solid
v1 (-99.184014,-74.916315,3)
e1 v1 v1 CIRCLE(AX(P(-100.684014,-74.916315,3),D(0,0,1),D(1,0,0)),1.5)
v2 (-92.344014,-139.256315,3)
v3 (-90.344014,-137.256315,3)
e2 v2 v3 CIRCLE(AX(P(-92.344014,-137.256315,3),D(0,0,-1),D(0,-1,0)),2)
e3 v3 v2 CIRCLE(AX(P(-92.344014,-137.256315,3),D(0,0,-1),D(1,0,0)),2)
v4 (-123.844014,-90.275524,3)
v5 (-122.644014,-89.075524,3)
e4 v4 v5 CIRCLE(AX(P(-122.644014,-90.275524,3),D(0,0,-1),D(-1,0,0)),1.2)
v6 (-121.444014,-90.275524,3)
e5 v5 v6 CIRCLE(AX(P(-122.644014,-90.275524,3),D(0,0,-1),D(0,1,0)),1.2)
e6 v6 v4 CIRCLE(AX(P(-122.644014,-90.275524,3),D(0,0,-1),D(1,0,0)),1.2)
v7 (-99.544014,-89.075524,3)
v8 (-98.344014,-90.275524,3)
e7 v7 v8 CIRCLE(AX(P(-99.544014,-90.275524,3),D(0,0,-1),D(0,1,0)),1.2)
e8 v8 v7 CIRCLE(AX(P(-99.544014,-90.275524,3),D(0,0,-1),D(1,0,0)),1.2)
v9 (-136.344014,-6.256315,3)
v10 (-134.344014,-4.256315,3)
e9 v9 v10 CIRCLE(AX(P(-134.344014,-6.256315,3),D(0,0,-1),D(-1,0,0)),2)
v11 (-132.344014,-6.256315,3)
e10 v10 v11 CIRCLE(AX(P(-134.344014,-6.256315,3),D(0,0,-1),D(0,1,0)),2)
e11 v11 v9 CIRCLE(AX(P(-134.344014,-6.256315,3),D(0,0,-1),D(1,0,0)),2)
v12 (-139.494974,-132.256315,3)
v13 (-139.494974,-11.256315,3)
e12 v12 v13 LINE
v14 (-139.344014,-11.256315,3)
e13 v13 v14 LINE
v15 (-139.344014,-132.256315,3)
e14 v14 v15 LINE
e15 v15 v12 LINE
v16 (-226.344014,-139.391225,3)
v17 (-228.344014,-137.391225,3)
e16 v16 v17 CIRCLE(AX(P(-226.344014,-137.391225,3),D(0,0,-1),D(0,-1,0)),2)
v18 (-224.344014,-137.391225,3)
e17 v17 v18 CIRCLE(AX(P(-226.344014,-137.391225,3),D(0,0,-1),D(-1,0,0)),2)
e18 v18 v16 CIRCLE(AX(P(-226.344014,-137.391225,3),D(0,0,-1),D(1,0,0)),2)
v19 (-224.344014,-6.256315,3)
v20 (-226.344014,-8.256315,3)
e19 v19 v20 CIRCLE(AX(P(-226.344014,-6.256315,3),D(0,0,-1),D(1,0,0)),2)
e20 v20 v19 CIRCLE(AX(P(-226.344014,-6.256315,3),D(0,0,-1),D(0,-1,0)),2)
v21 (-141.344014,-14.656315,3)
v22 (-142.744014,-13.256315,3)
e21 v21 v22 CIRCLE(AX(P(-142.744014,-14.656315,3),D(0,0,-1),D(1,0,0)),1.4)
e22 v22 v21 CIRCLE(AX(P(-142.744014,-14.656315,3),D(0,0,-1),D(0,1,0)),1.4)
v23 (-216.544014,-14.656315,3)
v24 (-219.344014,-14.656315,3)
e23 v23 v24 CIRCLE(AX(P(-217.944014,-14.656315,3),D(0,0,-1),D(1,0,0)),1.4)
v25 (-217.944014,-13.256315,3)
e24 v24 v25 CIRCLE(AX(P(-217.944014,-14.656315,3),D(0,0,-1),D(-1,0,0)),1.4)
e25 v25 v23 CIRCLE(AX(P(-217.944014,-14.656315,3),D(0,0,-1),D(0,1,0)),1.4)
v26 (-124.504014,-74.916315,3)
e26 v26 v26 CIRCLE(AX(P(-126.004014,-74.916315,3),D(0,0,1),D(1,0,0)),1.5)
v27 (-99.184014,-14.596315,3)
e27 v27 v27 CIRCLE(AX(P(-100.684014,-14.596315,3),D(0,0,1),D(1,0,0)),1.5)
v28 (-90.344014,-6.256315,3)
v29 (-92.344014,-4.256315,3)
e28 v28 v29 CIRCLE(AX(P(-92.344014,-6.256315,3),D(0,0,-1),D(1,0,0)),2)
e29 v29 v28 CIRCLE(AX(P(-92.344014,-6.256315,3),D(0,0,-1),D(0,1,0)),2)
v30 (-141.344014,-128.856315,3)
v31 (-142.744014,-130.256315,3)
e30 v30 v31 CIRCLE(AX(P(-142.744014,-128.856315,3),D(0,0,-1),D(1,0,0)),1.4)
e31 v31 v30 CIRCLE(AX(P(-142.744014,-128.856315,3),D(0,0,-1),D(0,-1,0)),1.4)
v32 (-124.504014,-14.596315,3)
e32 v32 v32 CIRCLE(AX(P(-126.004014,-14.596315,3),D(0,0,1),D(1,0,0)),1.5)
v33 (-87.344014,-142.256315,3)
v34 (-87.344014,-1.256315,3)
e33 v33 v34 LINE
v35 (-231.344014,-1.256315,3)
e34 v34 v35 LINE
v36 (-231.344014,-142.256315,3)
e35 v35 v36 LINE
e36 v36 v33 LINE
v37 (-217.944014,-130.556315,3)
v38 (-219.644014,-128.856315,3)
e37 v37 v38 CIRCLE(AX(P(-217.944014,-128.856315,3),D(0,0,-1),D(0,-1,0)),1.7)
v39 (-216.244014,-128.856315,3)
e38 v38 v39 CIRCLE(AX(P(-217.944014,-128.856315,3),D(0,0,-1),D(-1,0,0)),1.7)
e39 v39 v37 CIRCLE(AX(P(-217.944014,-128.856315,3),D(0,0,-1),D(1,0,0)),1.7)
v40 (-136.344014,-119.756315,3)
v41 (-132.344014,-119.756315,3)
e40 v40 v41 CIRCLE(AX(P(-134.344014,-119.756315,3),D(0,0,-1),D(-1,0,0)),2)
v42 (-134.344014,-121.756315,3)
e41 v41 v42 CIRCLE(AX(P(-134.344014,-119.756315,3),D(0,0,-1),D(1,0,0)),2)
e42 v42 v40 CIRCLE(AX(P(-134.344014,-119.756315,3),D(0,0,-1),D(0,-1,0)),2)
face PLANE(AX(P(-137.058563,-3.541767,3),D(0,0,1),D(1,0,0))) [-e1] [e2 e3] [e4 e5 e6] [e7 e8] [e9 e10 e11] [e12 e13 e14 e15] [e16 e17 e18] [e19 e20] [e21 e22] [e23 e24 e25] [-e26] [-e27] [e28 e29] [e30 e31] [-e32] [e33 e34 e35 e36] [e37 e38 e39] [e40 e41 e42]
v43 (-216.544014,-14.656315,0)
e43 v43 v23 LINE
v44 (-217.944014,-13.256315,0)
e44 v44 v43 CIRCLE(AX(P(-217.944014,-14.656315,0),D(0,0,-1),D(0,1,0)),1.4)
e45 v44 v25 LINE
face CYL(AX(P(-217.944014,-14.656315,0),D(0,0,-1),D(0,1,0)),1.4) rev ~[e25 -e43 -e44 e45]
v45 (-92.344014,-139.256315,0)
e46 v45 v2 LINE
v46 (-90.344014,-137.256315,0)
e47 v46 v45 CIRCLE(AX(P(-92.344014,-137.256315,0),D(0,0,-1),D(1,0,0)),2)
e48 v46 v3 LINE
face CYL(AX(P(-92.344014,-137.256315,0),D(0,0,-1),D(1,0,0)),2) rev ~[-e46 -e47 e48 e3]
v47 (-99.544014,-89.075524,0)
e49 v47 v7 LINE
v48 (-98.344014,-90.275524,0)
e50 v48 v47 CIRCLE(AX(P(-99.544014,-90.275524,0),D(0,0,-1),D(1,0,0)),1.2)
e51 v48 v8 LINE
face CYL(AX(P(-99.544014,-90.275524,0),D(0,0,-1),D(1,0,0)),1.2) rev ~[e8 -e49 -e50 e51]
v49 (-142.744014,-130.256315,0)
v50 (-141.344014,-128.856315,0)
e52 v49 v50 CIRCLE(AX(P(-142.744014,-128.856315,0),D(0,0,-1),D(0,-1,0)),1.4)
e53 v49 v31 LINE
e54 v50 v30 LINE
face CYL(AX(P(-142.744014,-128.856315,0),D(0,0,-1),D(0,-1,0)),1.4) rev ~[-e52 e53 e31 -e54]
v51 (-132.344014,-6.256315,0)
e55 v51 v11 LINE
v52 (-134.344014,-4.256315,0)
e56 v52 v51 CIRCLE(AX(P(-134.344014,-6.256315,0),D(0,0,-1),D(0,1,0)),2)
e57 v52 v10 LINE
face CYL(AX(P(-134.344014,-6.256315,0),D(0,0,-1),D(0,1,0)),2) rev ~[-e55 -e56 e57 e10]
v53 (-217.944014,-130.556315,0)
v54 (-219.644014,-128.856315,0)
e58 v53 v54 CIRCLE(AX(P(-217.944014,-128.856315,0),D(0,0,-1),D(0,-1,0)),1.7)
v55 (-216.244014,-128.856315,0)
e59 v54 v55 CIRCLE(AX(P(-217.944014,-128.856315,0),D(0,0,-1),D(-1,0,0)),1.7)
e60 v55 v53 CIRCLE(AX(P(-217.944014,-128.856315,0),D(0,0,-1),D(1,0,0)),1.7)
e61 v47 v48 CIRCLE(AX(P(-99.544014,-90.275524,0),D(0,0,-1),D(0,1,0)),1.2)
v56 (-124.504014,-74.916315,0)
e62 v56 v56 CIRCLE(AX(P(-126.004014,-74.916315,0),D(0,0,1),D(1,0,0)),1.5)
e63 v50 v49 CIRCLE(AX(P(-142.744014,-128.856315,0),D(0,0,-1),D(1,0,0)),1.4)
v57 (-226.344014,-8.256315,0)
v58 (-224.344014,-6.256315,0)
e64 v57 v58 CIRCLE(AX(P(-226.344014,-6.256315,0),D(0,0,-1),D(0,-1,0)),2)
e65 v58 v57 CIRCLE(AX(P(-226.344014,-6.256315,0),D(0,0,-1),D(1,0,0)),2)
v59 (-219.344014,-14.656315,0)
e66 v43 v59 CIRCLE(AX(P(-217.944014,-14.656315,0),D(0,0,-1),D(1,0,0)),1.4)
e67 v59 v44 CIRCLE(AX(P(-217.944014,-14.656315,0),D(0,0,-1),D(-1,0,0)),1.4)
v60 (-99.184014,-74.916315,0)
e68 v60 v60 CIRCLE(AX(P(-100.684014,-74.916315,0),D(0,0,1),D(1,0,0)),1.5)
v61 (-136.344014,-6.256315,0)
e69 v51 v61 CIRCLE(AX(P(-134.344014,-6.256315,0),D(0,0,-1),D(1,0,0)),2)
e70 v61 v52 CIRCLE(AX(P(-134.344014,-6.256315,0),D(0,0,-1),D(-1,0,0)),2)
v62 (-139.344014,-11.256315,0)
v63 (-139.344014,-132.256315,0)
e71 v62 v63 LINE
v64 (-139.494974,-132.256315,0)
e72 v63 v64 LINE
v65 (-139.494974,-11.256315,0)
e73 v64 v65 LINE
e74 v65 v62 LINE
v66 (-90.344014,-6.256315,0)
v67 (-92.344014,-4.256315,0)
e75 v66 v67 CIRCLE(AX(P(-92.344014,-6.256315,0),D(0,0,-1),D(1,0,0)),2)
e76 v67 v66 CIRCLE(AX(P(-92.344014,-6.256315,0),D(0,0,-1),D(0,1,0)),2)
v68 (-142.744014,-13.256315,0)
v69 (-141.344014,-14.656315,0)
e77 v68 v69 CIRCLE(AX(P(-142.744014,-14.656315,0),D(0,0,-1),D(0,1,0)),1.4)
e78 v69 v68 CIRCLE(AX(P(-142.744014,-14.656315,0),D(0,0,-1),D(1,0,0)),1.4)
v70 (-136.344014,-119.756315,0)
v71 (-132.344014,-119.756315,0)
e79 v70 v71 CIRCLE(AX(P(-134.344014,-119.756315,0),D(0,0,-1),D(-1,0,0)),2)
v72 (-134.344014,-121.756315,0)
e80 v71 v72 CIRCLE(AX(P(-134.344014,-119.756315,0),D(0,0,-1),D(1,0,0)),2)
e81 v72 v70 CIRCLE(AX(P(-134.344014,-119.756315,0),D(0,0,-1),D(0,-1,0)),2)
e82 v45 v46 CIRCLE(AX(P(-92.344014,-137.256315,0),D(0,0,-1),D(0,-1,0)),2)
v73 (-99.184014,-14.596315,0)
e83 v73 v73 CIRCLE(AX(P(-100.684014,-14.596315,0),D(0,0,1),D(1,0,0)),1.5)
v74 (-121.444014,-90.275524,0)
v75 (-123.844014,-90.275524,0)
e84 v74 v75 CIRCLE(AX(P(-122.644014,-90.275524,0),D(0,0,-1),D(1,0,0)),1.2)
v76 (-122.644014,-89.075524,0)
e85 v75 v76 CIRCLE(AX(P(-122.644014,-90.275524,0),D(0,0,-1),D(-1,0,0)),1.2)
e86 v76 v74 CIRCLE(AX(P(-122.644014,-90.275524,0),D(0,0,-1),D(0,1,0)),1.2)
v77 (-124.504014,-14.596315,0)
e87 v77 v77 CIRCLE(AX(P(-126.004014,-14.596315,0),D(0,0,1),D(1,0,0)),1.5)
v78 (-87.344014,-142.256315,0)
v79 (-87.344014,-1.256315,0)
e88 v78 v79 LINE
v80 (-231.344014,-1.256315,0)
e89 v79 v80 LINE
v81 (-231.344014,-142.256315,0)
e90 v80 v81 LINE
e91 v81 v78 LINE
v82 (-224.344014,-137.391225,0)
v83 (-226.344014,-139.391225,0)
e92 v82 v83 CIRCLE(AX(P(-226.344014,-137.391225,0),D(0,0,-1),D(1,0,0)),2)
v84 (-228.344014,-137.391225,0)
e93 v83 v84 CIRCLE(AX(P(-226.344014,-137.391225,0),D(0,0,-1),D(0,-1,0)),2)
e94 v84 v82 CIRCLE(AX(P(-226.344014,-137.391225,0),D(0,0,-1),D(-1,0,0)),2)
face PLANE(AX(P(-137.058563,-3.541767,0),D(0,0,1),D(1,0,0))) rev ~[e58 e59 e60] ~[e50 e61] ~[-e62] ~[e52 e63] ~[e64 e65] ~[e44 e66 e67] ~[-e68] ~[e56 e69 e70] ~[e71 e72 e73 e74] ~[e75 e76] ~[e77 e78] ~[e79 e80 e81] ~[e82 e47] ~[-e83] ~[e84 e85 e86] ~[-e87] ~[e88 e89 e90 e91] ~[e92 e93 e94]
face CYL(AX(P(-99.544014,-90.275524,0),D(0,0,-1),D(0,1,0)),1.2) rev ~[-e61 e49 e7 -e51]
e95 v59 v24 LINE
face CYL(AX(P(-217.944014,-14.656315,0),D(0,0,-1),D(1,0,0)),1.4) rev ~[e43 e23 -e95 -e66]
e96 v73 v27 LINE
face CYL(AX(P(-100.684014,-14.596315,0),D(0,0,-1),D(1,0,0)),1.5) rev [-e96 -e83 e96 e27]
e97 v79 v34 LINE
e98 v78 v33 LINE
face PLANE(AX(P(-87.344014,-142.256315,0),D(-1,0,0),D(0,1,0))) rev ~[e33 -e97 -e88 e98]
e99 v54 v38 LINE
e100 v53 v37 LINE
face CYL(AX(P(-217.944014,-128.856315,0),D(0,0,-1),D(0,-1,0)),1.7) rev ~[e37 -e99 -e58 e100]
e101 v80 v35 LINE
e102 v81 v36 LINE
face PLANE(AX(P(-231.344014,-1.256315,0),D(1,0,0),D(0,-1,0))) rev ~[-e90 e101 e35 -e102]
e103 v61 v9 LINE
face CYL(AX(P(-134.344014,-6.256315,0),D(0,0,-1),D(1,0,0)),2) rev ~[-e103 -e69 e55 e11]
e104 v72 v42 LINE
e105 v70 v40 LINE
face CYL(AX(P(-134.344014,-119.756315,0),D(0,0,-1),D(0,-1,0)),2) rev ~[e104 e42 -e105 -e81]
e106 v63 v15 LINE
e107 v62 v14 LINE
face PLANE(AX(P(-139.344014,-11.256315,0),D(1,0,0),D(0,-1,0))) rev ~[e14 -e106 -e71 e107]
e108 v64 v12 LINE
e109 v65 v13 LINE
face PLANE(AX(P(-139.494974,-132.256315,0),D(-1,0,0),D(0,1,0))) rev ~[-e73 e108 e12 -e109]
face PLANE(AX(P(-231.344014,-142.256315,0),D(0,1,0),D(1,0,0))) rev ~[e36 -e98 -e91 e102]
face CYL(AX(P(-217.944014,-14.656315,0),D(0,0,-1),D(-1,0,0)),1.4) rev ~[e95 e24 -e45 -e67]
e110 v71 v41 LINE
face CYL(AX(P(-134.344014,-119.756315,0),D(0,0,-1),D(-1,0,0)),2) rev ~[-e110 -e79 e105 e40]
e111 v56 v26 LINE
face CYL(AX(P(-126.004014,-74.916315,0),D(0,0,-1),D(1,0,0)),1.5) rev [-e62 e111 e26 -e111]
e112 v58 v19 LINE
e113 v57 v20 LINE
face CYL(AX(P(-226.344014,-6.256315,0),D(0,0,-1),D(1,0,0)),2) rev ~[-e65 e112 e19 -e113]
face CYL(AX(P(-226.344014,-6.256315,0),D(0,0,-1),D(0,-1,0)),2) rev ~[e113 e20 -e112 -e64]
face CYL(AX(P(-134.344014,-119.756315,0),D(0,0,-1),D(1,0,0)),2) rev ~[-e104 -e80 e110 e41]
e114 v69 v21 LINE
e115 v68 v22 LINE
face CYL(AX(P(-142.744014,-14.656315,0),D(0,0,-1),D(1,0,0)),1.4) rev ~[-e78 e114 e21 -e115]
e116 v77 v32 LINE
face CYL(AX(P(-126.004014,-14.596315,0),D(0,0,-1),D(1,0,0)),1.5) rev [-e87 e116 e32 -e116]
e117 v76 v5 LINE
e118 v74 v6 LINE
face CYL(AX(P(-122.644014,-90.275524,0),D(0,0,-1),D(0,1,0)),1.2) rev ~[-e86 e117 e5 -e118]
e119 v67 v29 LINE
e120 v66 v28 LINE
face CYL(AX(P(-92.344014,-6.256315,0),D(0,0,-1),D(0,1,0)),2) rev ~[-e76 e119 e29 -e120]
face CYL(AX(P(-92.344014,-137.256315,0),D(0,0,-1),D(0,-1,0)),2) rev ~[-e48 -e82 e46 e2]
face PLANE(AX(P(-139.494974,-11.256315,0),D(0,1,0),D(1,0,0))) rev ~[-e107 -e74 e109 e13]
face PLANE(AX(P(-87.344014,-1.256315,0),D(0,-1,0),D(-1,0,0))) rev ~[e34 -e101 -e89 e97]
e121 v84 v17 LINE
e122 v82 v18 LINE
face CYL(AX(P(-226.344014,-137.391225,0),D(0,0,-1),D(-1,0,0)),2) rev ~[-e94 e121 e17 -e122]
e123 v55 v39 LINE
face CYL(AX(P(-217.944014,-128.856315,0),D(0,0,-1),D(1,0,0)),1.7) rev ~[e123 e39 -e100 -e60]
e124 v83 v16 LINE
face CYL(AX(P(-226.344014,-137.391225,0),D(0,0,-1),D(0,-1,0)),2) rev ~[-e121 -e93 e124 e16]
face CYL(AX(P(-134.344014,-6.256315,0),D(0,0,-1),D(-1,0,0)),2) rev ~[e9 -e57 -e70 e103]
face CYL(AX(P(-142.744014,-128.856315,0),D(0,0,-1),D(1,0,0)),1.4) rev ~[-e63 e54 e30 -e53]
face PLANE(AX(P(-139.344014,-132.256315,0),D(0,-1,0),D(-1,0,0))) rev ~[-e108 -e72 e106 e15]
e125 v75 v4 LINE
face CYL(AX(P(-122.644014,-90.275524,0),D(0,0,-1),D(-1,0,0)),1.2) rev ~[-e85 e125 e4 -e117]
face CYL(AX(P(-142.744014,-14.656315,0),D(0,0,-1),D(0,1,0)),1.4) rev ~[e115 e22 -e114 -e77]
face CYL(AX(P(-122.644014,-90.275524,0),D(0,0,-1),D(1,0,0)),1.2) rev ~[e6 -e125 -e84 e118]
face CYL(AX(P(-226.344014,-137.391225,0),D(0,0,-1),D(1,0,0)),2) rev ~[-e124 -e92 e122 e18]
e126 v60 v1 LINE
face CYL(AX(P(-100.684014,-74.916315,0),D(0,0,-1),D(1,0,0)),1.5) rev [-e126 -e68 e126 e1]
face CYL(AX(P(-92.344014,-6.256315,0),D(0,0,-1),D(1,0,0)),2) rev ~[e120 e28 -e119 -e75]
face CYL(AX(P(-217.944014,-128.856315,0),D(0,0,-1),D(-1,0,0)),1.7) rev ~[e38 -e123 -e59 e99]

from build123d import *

# Parameters (mm, degrees)
F0_R     = 1.5
F0_W     = 3
F0_H     = 5
F0_W_2   = 4
F0_H_2   = 75.28
F0_H_3   = 40.64
F0_H_4   = 5.08
F1_DEPTH = 3


# Not quite as in the source:
# - a feature names something its author has since deleted; it is built from what else it names


with BuildPart() as f1:
    # F0 (on Top) → F1 (new body)
    with BuildSketch(Plane.XY):
        with BuildLine():
            Line((-134.3440142274, -1.256315279), (-139.3440142274, -1.256315279))
            Line((-139.3440142274, -1.256315279), (-139.3440142274, -6.256315279))
            Line((-139.3440142274, -6.256315279), (-136.3440142274, -6.256315279))
            ThreePointArc((-136.3440142274, -6.256315279), (-135.7582277898, -4.8421017166), (-134.3440142274, -4.256315279))
            Line((-134.3440142274, -4.256315279), (-134.3440142274, -1.256315279))
        make_face()
        Polygon((-139.3440142274, -6.256315279), (-139.3440142274, -1.256315279), (-221.3440142274, -1.256315279), (-221.3440142274, -6.256315279), (-221.3440142274, -11.256315279), (-217.9440142274, -11.256315279), (-151.4240142274, -11.256315279), (-147.4240142274, -11.256315279), (-142.7440142274, -11.256315279), (-139.4949736476, -11.256315279), (-139.3440142274, -11.256315279), align=None)
        with BuildLine():
            Line((-129.3440142274, -1.256315279), (-134.3440142274, -1.256315279))
            Line((-134.3440142274, -1.256315279), (-134.3440142274, -4.256315279))
            ThreePointArc((-134.3440142274, -4.256315279), (-132.929800665, -4.8421017166), (-132.3440142274, -6.256315279))
            ThreePointArc((-132.3440142274, -6.256315279), (-134.3440142274, -8.256315279), (-136.3440142274, -6.256315279))
            Line((-136.3440142274, -6.256315279), (-139.3440142274, -6.256315279))
            Line((-139.3440142274, -6.256315279), (-139.3440142274, -11.256315279))
            Line((-139.3440142274, -11.256315279), (-129.3440142274, -11.256315279))
            Line((-129.3440142274, -11.256315279), (-129.3440142274, -6.256315279))
            Line((-129.3440142274, -6.256315279), (-129.3440142274, -1.256315279))
        make_face()
        with BuildLine():
            Line((-221.3440142274, -6.256315279), (-221.3440142274, -1.256315279))
            Line((-221.3440142274, -1.256315279), (-231.3440142274, -1.256315279))
            Line((-231.3440142274, -1.256315279), (-231.3440142274, -132.256315279))
            Line((-231.3440142274, -132.256315279), (-221.3440142274, -132.256315279))
            Line((-221.3440142274, -132.256315279), (-221.3440142274, -128.856315279))
            Line((-221.3440142274, -128.856315279), (-221.3440142274, -14.656315279))
            Line((-221.3440142274, -14.656315279), (-221.3440142274, -11.256315279))
            Line((-221.3440142274, -11.256315279), (-226.3440142274, -11.256315279))
            Line((-226.3440142274, -11.256315279), (-226.3440142274, -8.256315279))
            ThreePointArc((-226.3440142274, -8.256315279), (-227.7582277898, -4.8421017166), (-224.3440142274, -6.256315279))
            Line((-224.3440142274, -6.256315279), (-221.3440142274, -6.256315279))
        make_face()
        with BuildLine():
            Line((-92.3440142274, -1.256315279), (-129.3440142274, -1.256315279))
            Line((-129.3440142274, -1.256315279), (-129.3440142274, -6.256315279))
            Line((-129.3440142274, -6.256315279), (-126.3440142274, -6.256315279))
            Line((-126.3440142274, -6.256315279), (-100.3440142274, -6.256315279))
            Line((-100.3440142274, -6.256315279), (-97.3440142274, -6.256315279))
            Line((-97.3440142274, -6.256315279), (-97.3440142274, -11.256315279))
            Line((-97.3440142274, -11.256315279), (-97.3440142274, -14.596315279))
            Line((-97.3440142274, -14.596315279), (-97.3440142274, -74.916315279))
            Line((-97.3440142274, -74.916315279), (-97.3440142274, -78.256315279))
            Line((-97.3440142274, -78.256315279), (-100.6840142274, -78.256315279))
            Line((-100.6840142274, -78.256315279), (-126.0040142274, -78.256315279))
            Line((-126.0040142274, -78.256315279), (-129.3440142274, -78.256315279))
            Line((-129.3440142274, -78.256315279), (-129.3440142274, -108.756315279))
            Line((-129.3440142274, -108.756315279), (-129.3440142274, -111.756315279))
            Line((-129.3440142274, -111.756315279), (-129.3440142274, -114.756315279))
            Line((-129.3440142274, -114.756315279), (-129.3440142274, -124.756315279))
            Line((-129.3440142274, -124.756315279), (-129.3440142274, -142.256315279))
            Line((-129.3440142274, -142.256315279), (-92.3440142274, -142.256315279))
            Line((-92.3440142274, -142.256315279), (-92.3440142274, -139.256315279))
            ThreePointArc((-92.3440142274, -139.256315279), (-93.7582277898, -135.8421017166), (-90.3440142274, -137.256315279))
            Line((-90.3440142274, -137.256315279), (-87.3440142274, -137.256315279))
            Line((-87.3440142274, -137.256315279), (-87.3440142274, -6.256315279))
            Line((-87.3440142274, -6.256315279), (-90.3440142274, -6.256315279))
            ThreePointArc((-90.3440142274, -6.256315279), (-93.7582277898, -7.6705288414), (-92.3440142274, -4.256315279))
            Line((-92.3440142274, -4.256315279), (-92.3440142274, -1.256315279))
        make_face()
        Polygon((-97.8440142274, -124.5755243927), (-124.3440142274, -124.5755243927), (-124.3440142274, -90.2755243927), (-124.3440142274, -88.5755243927), (-122.6440142274, -88.5755243927), (-99.5440142274, -88.5755243927), (-97.8440142274, -88.5755243927), (-97.8440142274, -90.2755243927), align=None, mode=Mode.SUBTRACT)
        Polygon((-129.3440142274, -11.256315279), (-139.3440142274, -11.256315279), (-139.3440142274, -14.656315279), (-139.3440142274, -114.756315279), (-129.3440142274, -114.756315279), (-129.3440142274, -111.756315279), (-129.3440142274, -108.756315279), (-129.3440142274, -78.256315279), (-129.3440142274, -74.916315279), (-129.3440142274, -27.956315279), (-129.3440142274, -27.456315279), (-129.3440142274, -14.596315279), (-129.3440142274, -14.056315279), align=None)
        with BuildLine():
            Line((-221.3440142274, -11.256315279), (-221.3440142274, -6.256315279))
            Line((-221.3440142274, -6.256315279), (-224.3440142274, -6.256315279))
            ThreePointArc((-224.3440142274, -6.256315279), (-224.929800665, -7.6705288414), (-226.3440142274, -8.256315279))
            Line((-226.3440142274, -8.256315279), (-226.3440142274, -11.256315279))
            Line((-226.3440142274, -11.256315279), (-221.3440142274, -11.256315279))
        make_face()
        Polygon((-126.3440142274, -6.256315279), (-129.3440142274, -6.256315279), (-129.3440142274, -11.256315279), (-126.5440142274, -11.256315279), (-126.3440142274, -11.256315279), align=None)
        with BuildLine():
            Line((-87.3440142274, -1.256315279), (-92.3440142274, -1.256315279))
            Line((-92.3440142274, -1.256315279), (-92.3440142274, -4.256315279))
            ThreePointArc((-92.3440142274, -4.256315279), (-90.929800665, -4.8421017166), (-90.3440142274, -6.256315279))
            Line((-90.3440142274, -6.256315279), (-87.3440142274, -6.256315279))
            Line((-87.3440142274, -6.256315279), (-87.3440142274, -1.256315279))
        make_face()
        Polygon((-126.5440142274, -11.256315279), (-129.3440142274, -11.256315279), (-129.3440142274, -14.056315279), (-129.3440142274, -14.596315279), (-129.3440142274, -27.456315279), (-129.3440142274, -27.956315279), (-129.3440142274, -74.916315279), (-129.3440142274, -78.256315279), (-126.0040142274, -78.256315279), (-100.6840142274, -78.256315279), (-97.3440142274, -78.256315279), (-97.3440142274, -74.916315279), (-97.3440142274, -14.596315279), (-97.3440142274, -11.256315279), (-100.3440142274, -11.256315279), (-100.6840142274, -11.256315279), (-126.0040142274, -11.256315279), (-126.3440142274, -11.256315279), align=None)
        with Locations((-126.0040142274, -74.916315279)):
            Circle(F0_R, mode=Mode.SUBTRACT)
        with Locations((-100.6840142274, -74.916315279)):
            Circle(F0_R, mode=Mode.SUBTRACT)
        with Locations((-126.0040142274, -14.596315279)):
            Circle(F0_R, mode=Mode.SUBTRACT)
        with Locations((-100.6840142274, -14.596315279)):
            Circle(F0_R, mode=Mode.SUBTRACT)
        with BuildLine():
            Line((-139.4949736476, -14.656315279), (-139.4949736476, -11.256315279))
            Line((-139.4949736476, -11.256315279), (-142.7440142274, -11.256315279))
            Line((-142.7440142274, -11.256315279), (-142.7440142274, -13.256315279))
            ThreePointArc((-142.7440142274, -13.256315279), (-141.7540647337, -13.6663657853), (-141.3440142274, -14.656315279))
            Line((-141.3440142274, -14.656315279), (-139.4949736476, -14.656315279))
        make_face()
        with BuildLine():
            Line((-217.9440142274, -11.256315279), (-221.3440142274, -11.256315279))
            Line((-221.3440142274, -11.256315279), (-221.3440142274, -14.656315279))
            Line((-221.3440142274, -14.656315279), (-219.3440142274, -14.656315279))
            ThreePointArc((-219.3440142274, -14.656315279), (-218.9339637211, -13.6663657853), (-217.9440142274, -13.256315279))
            Line((-217.9440142274, -13.256315279), (-217.9440142274, -11.256315279))
        make_face()
        with BuildLine():
            Line((-221.3440142274, -132.256315279), (-231.3440142274, -132.256315279))
            Line((-231.3440142274, -132.256315279), (-231.3440142274, -137.3912245035))
            Line((-231.3440142274, -137.3912245035), (-228.3440142274, -137.3912245035))
            ThreePointArc((-228.3440142274, -137.3912245035), (-226.3440142274, -135.3912245035), (-224.3440142274, -137.3912245035))
            ThreePointArc((-224.3440142274, -137.3912245035), (-224.929800665, -138.8054380659), (-226.3440142274, -139.3912245035))
            Line((-226.3440142274, -139.3912245035), (-226.3440142274, -142.256315279))
            Line((-226.3440142274, -142.256315279), (-221.3440142274, -142.256315279))
            Line((-221.3440142274, -142.256315279), (-221.3440142274, -132.256315279))
        make_face()
        Polygon((-100.3440142274, -6.256315279), (-126.3440142274, -6.256315279), (-126.3440142274, -11.256315279), (-126.0040142274, -11.256315279), (-100.6840142274, -11.256315279), (-100.3440142274, -11.256315279), align=None)
        with BuildLine():
            Line((-139.4949736476, -128.856315279), (-139.4949736476, -14.656315279))
            Line((-139.4949736476, -14.656315279), (-141.3440142274, -14.656315279))
            ThreePointArc((-141.3440142274, -14.656315279), (-143.7339637211, -15.6462647727), (-142.7440142274, -13.256315279))
            Line((-142.7440142274, -13.256315279), (-142.7440142274, -11.256315279))
            Line((-142.7440142274, -11.256315279), (-147.4240142274, -11.256315279))
            Line((-147.4240142274, -11.256315279), (-147.4240142274, -86.536315279))
            Line((-147.4240142274, -86.536315279), (-147.4240142274, -127.176315279))
            Line((-147.4240142274, -127.176315279), (-147.4240142274, -132.256315279))
            Line((-147.4240142274, -132.256315279), (-142.7440142274, -132.256315279))
            Line((-142.7440142274, -132.256315279), (-142.7440142274, -130.256315279))
            ThreePointArc((-142.7440142274, -130.256315279), (-143.7339637211, -127.8663657853), (-141.3440142274, -128.856315279))
            Line((-141.3440142274, -128.856315279), (-139.4949736476, -128.856315279))
        make_face()
        with BuildLine():
            Line((-129.3440142274, -114.756315279), (-139.3440142274, -114.756315279))
            Line((-139.3440142274, -114.756315279), (-139.3440142274, -119.756315279))
            Line((-139.3440142274, -119.756315279), (-136.3440142274, -119.756315279))
            ThreePointArc((-136.3440142274, -119.756315279), (-134.3440142274, -117.756315279), (-132.3440142274, -119.756315279))
            ThreePointArc((-132.3440142274, -119.756315279), (-132.929800665, -121.1705288414), (-134.3440142274, -121.756315279))
            Line((-134.3440142274, -121.756315279), (-134.3440142274, -124.756315279))
            Line((-134.3440142274, -124.756315279), (-129.3440142274, -124.756315279))
            Line((-129.3440142274, -124.756315279), (-129.3440142274, -114.756315279))
        make_face()
        with BuildLine():
            Line((-151.4240142274, -11.256315279), (-217.9440142274, -11.256315279))
            Line((-217.9440142274, -11.256315279), (-217.9440142274, -13.256315279))
            ThreePointArc((-217.9440142274, -13.256315279), (-216.9540647337, -13.6663657853), (-216.5440142274, -14.656315279))
            ThreePointArc((-216.5440142274, -14.656315279), (-217.9440142274, -16.056315279), (-219.3440142274, -14.656315279))
            Line((-219.3440142274, -14.656315279), (-221.3440142274, -14.656315279))
            Line((-221.3440142274, -14.656315279), (-221.3440142274, -128.856315279))
            Line((-221.3440142274, -128.856315279), (-219.6440142274, -128.856315279))
            ThreePointArc((-219.6440142274, -128.856315279), (-217.9440142274, -127.156315279), (-216.2440142274, -128.856315279))
            ThreePointArc((-216.2440142274, -128.856315279), (-216.7419326994, -130.058396807), (-217.9440142274, -130.556315279))
            Line((-217.9440142274, -130.556315279), (-217.9440142274, -132.256315279))
            Line((-217.9440142274, -132.256315279), (-151.4240142274, -132.256315279))
            Line((-151.4240142274, -132.256315279), (-151.4240142274, -127.176315279))
            Line((-151.4240142274, -127.176315279), (-151.4240142274, -86.536315279))
            Line((-151.4240142274, -86.536315279), (-151.4240142274, -11.256315279))
        make_face()
        with BuildLine():
            Line((-221.3440142274, -128.856315279), (-221.3440142274, -132.256315279))
            Line((-221.3440142274, -132.256315279), (-217.9440142274, -132.256315279))
            Line((-217.9440142274, -132.256315279), (-217.9440142274, -130.556315279))
            ThreePointArc((-217.9440142274, -130.556315279), (-219.1460957554, -130.058396807), (-219.6440142274, -128.856315279))
            Line((-219.6440142274, -128.856315279), (-221.3440142274, -128.856315279))
        make_face()
        Polygon((-217.9440142274, -132.256315279), (-221.3440142274, -132.256315279), (-221.3440142274, -142.256315279), (-139.3440142274, -142.256315279), (-139.4949736476, -132.256315279), (-142.7440142274, -132.256315279), (-147.4240142274, -132.256315279), (-151.4240142274, -132.256315279), align=None)
        with BuildLine():
            Line((-228.3440142274, -137.3912245035), (-231.3440142274, -137.3912245035))
            Line((-231.3440142274, -137.3912245035), (-231.3440142274, -142.256315279))
            Line((-231.3440142274, -142.256315279), (-226.3440142274, -142.256315279))
            Line((-226.3440142274, -142.256315279), (-226.3440142274, -139.3912245035))
            ThreePointArc((-226.3440142274, -139.3912245035), (-227.7582277898, -138.8054380659), (-228.3440142274, -137.3912245035))
        make_face()
        with Locations((-98.8440142274, -8.756315279)):
            Rectangle(F0_W, F0_H)
        with BuildLine():
            Line((-139.4949736476, -132.256315279), (-139.4949736476, -128.856315279))
            Line((-139.4949736476, -128.856315279), (-141.3440142274, -128.856315279))
            ThreePointArc((-141.3440142274, -128.856315279), (-141.7540647337, -129.8462647727), (-142.7440142274, -130.256315279))
            Line((-142.7440142274, -130.256315279), (-142.7440142274, -132.256315279))
            Line((-142.7440142274, -132.256315279), (-139.4949736476, -132.256315279))
        make_face()
        with Locations((-149.4240142274, -48.896315279)):
            Rectangle(F0_W_2, F0_H_2)
        with BuildLine():
            Line((-136.3440142274, -119.756315279), (-139.3440142274, -119.756315279))
            Line((-139.3440142274, -119.756315279), (-139.3440142274, -124.756315279))
            Line((-139.3440142274, -124.756315279), (-139.1930548072, -124.756315279))
            Line((-139.1930548072, -124.756315279), (-134.3440142274, -124.756315279))
            Line((-134.3440142274, -124.756315279), (-134.3440142274, -121.756315279))
            ThreePointArc((-134.3440142274, -121.756315279), (-135.7582277898, -121.1705288414), (-136.3440142274, -119.756315279))
        make_face()
        with BuildLine():
            Line((-87.3440142274, -142.256315279), (-87.3440142274, -137.256315279))
            Line((-87.3440142274, -137.256315279), (-90.3440142274, -137.256315279))
            ThreePointArc((-90.3440142274, -137.256315279), (-90.929800665, -138.6705288414), (-92.3440142274, -139.256315279))
            Line((-92.3440142274, -139.256315279), (-92.3440142274, -142.256315279))
            Line((-92.3440142274, -142.256315279), (-87.3440142274, -142.256315279))
        make_face()
        Polygon((-139.3440142274, -132.256315279), (-139.4949736476, -132.256315279), (-139.3440142274, -142.256315279), (-129.3440142274, -142.256315279), (-129.3440142274, -124.756315279), (-134.3440142274, -124.756315279), (-139.1930548072, -124.756315279), (-139.3440142274, -124.756315279), (-139.3440142274, -128.856315279), align=None)
        with Locations((-149.4240142274, -106.856315279)):
            Rectangle(F0_W_2, F0_H_3)
        with Locations((-149.4240142274, -129.716315279)):
            Rectangle(F0_W_2, F0_H_4)
        with BuildLine():
            Line((-124.3440142274, -90.2755243927), (-124.3440142274, -124.5755243927))
            Line((-124.3440142274, -124.5755243927), (-97.8440142274, -124.5755243927))
            Line((-97.8440142274, -124.5755243927), (-97.8440142274, -90.2755243927))
            Line((-97.8440142274, -90.2755243927), (-98.3440142274, -90.2755243927))
            ThreePointArc((-98.3440142274, -90.2755243927), (-100.3925423648, -91.1240525301), (-99.5440142274, -89.0755243927))
            Line((-99.5440142274, -89.0755243927), (-99.5440142274, -88.5755243927))
            Line((-99.5440142274, -88.5755243927), (-122.6440142274, -88.5755243927))
            Line((-122.6440142274, -88.5755243927), (-122.6440142274, -89.0755243927))
            ThreePointArc((-122.6440142274, -89.0755243927), (-121.79548609, -89.4269962553), (-121.4440142274, -90.2755243927))
            ThreePointArc((-121.4440142274, -90.2755243927), (-122.6440142274, -91.4755243927), (-123.8440142274, -90.2755243927))
            Line((-123.8440142274, -90.2755243927), (-124.3440142274, -90.2755243927))
        make_face()
        with BuildLine():
            Line((-124.3440142274, -88.5755243927), (-124.3440142274, -90.2755243927))
            Line((-124.3440142274, -90.2755243927), (-123.8440142274, -90.2755243927))
            ThreePointArc((-123.8440142274, -90.2755243927), (-123.4925423648, -89.4269962553), (-122.6440142274, -89.0755243927))
            Line((-122.6440142274, -89.0755243927), (-122.6440142274, -88.5755243927))
            Line((-122.6440142274, -88.5755243927), (-124.3440142274, -88.5755243927))
        make_face()
        with BuildLine():
            Line((-98.3440142274, -90.2755243927), (-97.8440142274, -90.2755243927))
            Line((-97.8440142274, -90.2755243927), (-97.8440142274, -88.5755243927))
            Line((-97.8440142274, -88.5755243927), (-99.5440142274, -88.5755243927))
            Line((-99.5440142274, -88.5755243927), (-99.5440142274, -89.0755243927))
            ThreePointArc((-99.5440142274, -89.0755243927), (-98.69548609, -89.4269962553), (-98.3440142274, -90.2755243927))
        make_face()
    extrude(amount=F1_DEPTH)


solid = f1.part
